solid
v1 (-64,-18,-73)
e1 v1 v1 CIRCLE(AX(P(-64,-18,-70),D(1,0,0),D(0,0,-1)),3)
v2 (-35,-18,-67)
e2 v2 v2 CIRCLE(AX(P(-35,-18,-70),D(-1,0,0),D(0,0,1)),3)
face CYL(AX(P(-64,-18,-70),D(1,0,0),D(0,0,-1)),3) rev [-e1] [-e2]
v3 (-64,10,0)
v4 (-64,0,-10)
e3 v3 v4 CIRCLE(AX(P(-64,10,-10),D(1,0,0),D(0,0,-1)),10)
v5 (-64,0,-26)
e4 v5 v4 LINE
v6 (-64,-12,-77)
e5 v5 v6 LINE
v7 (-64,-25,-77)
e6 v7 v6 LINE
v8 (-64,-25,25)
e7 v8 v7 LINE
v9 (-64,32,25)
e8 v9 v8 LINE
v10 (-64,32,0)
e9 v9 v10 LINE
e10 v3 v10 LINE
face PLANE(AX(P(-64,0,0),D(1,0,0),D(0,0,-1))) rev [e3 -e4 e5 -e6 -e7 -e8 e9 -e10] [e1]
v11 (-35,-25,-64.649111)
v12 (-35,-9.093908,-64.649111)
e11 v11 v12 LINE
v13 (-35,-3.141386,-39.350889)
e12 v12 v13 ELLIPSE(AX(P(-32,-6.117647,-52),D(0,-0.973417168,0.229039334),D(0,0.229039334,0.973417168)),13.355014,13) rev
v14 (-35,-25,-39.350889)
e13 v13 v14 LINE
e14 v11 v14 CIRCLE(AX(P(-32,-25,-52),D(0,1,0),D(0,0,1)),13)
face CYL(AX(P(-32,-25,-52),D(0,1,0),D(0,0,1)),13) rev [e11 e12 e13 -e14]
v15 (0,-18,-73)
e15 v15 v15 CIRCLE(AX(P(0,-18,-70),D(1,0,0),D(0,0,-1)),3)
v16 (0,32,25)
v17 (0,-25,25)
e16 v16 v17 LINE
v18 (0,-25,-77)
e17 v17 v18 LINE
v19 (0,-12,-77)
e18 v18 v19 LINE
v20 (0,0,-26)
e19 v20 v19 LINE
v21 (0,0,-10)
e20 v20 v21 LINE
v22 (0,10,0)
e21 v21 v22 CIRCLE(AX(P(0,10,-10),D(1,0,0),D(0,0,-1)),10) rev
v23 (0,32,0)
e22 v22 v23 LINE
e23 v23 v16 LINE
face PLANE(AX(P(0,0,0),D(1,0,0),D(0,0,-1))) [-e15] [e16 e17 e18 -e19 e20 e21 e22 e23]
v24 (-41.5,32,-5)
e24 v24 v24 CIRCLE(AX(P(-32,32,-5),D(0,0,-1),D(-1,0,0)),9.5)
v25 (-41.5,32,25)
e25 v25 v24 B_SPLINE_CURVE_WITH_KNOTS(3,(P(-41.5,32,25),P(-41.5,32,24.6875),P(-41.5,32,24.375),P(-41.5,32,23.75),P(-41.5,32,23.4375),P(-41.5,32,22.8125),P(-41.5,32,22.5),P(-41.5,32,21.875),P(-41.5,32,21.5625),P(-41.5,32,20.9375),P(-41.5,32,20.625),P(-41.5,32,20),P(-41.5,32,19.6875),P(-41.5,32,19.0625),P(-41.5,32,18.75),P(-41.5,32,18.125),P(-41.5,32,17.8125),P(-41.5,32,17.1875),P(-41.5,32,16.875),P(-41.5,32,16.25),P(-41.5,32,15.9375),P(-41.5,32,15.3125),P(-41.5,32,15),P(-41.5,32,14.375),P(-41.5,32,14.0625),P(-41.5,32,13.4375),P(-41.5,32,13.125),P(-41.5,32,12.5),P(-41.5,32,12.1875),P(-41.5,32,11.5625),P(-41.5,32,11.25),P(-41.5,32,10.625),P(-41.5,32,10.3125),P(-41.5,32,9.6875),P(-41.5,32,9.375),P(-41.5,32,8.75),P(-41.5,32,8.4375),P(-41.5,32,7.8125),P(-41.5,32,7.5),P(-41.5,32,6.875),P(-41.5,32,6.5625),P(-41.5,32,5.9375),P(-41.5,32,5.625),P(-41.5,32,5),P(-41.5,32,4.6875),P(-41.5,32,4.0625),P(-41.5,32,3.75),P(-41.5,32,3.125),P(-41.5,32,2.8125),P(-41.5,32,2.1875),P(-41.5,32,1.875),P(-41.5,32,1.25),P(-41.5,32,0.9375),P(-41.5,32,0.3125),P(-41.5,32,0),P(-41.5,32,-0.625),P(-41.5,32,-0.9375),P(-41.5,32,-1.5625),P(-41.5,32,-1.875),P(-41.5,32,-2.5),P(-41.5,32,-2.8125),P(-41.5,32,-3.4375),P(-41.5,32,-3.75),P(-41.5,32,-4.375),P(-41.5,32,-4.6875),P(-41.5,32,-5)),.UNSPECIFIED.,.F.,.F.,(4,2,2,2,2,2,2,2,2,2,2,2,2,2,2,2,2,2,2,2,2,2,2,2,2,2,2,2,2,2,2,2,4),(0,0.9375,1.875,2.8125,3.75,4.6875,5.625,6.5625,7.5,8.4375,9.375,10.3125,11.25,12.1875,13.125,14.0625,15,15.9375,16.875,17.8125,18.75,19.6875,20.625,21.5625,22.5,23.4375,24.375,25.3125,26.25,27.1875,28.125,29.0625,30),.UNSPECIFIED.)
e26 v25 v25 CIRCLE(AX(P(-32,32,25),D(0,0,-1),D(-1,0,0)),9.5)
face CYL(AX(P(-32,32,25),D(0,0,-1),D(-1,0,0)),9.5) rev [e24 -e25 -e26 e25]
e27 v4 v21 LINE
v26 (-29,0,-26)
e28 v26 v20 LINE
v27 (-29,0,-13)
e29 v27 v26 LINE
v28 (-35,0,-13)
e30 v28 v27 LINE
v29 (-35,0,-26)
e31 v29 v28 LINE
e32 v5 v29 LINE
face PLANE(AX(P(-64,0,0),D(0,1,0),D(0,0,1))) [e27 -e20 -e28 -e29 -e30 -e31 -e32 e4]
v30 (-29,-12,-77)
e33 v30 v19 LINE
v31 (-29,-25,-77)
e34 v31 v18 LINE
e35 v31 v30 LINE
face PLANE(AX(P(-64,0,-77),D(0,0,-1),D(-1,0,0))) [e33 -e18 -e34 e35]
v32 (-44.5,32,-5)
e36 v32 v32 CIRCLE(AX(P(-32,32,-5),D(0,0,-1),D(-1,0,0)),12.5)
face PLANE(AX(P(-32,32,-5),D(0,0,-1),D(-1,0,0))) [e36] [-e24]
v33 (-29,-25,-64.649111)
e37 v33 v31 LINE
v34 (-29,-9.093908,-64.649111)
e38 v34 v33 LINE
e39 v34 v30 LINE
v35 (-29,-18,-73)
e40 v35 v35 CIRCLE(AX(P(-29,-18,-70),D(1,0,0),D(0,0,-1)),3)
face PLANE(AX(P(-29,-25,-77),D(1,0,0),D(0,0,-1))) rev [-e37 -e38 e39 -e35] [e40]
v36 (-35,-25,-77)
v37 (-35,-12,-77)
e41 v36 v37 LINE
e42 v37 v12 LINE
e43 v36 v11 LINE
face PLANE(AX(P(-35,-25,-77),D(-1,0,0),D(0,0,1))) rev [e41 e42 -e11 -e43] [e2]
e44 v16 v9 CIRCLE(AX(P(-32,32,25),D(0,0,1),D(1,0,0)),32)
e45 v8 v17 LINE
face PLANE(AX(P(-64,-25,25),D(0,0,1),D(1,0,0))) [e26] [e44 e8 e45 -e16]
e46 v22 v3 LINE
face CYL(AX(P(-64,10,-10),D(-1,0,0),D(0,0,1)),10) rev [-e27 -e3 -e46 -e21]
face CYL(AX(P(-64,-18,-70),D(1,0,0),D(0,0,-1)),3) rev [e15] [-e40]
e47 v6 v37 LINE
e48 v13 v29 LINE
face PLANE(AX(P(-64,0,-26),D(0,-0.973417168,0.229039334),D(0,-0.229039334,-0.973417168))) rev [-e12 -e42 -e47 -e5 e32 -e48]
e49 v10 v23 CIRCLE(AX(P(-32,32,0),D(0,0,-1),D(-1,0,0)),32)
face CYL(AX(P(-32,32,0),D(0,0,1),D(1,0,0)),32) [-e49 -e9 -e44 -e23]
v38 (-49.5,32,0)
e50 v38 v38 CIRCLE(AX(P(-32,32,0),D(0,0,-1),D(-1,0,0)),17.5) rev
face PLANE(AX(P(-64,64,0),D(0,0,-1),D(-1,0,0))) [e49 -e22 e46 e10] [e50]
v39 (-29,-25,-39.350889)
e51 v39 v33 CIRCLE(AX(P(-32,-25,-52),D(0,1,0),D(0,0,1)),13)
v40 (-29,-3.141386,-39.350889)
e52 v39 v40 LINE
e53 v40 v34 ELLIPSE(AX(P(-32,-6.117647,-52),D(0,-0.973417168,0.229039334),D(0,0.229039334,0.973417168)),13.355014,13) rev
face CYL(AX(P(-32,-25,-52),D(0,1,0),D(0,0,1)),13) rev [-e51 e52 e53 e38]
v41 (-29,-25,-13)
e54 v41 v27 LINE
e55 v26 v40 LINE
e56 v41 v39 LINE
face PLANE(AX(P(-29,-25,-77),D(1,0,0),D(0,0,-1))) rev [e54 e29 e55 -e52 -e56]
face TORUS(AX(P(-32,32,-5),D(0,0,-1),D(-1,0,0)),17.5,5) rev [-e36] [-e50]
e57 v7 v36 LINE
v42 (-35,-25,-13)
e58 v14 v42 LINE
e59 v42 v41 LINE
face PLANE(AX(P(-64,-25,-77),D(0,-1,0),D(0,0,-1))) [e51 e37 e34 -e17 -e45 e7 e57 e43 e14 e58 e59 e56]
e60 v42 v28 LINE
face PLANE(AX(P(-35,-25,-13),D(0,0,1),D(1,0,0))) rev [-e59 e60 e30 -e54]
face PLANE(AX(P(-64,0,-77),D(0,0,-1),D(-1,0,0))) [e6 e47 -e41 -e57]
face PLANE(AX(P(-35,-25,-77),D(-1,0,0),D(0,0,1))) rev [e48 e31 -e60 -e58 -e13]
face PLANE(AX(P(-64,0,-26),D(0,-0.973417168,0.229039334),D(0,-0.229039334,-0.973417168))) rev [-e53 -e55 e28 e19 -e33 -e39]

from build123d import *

# Parameters (mm, degrees)
ESTRUSIONE_ESTRUSIONE1_DEPTH = 64
RACCORDO1_RADIUS             = 32
RACCORDO1_LENGTH             = 25
SCHIZZO2_R                   = 13
TAGLIO_ESTRUSIONE1_DEPTH     = 119.831813922
SCHIZZO5_W                   = 6
SCHIZZO5_H                   = 64
TAGLIO_ESTRUSIONE2_DEPTH     = 119.831813922
TAGLIO_ESTRUSIONE3_DEPTH     = 119.831813922
SCHIZZO7_R                   = 3
TAGLIO_ESTRUSIONE4_DEPTH     = 119.831813922
SCHIZZO8_R                   = 12.5
ESTRUSIONE_ESTRUSIONE2_DEPTH = 5
SCHIZZO9_R                   = 9.5
TAGLIO_ESTRUSIONE5_DEPTH     = 116.654658358
RACCORDO2_R                  = 10
RACCORDO3_R                  = 5


with BuildPart() as part:
    # Schizzo1 → Estrusione-Estrusione1 (new body)
    with BuildSketch(Plane(origin=(0, 0, 0), x_dir=(0, 0, -1), z_dir=(1, 0, 0))):
        Polygon((0, 0), (77, 0), (77, -25), (-25, -25), (-25, 64), (0, 64), align=None)
    extrude(amount=-ESTRUSIONE_ESTRUSIONE1_DEPTH)

    # Raccordo1: full round fillet: the end face becomes a half cylinder, R = half its width
    raccordo1_face = Plane((-32, 64, 12.5), x_dir=(0, 0, -1), z_dir=(0, 1, 0))  # on the end face: x along it, z out of the body
    raccordo1_slab = raccordo1_face.offset(-RACCORDO1_RADIUS / 2) * Box(RACCORDO1_LENGTH, 2 * RACCORDO1_RADIUS, RACCORDO1_RADIUS, mode=Mode.PRIVATE)  # the body's end, R deep
    raccordo1_round = Plane((-32, 32, 12.5), x_dir=(0, 1, 0), z_dir=(0, 0, -1)) * Cylinder(RACCORDO1_RADIUS, RACCORDO1_LENGTH, mode=Mode.PRIVATE)  # its axis R under the face
    add(raccordo1_slab - raccordo1_round, mode=Mode.SUBTRACT)

    # Schizzo2 → Taglio-Estrusione1 (cut, through all)
    with BuildSketch(Plane(origin=(0, 0, 0), x_dir=(1, 0, 0), z_dir=(0, 1, 0))):
        with Locations(Location((-32, 52, 0), (0, 0, 270))):
            Circle(SCHIZZO2_R)
    extrude(amount=-TAGLIO_ESTRUSIONE1_DEPTH, mode=Mode.SUBTRACT)

    # Schizzo5 → Taglio-Estrusione2 (cut, through all)
    with BuildSketch(Plane(origin=(0, 0, 0), x_dir=(1, 0, 0), z_dir=(0, 1, 0))):
        with Locations((-32, 45)):
            Rectangle(SCHIZZO5_W, SCHIZZO5_H)
    extrude(amount=-TAGLIO_ESTRUSIONE2_DEPTH, mode=Mode.SUBTRACT)

    # Schizzo6 → Taglio-Estrusione3 (cut, through all)
    with BuildSketch(Plane(origin=(0, 0, 0), x_dir=(0, 0, -1), z_dir=(1, 0, 0))):
        Polygon((26, 0), (77, -12), (77, 0), align=None)
    extrude(amount=-TAGLIO_ESTRUSIONE3_DEPTH, mode=Mode.SUBTRACT)

    # Schizzo7 → Taglio-Estrusione4 (cut, through all)
    with BuildSketch(Plane(origin=(0, 0, 0), x_dir=(0, 0, -1), z_dir=(1, 0, 0))):
        with Locations((70, -18)):
            Circle(SCHIZZO7_R)
    extrude(amount=-TAGLIO_ESTRUSIONE4_DEPTH, mode=Mode.SUBTRACT)

    # Schizzo8 → Estrusione-Estrusione2 (add)
    with BuildSketch(Plane(origin=(0, 0, 0), x_dir=(-1, 0, 0), z_dir=(0, 0, -1))):
        with Locations((32, 32)):
            Circle(SCHIZZO8_R)
    extrude(amount=ESTRUSIONE_ESTRUSIONE2_DEPTH)

    # Schizzo9 → Taglio-Estrusione5 (cut, through all)
    with BuildSketch(Plane(origin=(0, 0, -5), x_dir=(-1, 0, 0), z_dir=(0, 0, -1))):
        with Locations((32, 32)):
            Circle(SCHIZZO9_R)
    extrude(amount=-TAGLIO_ESTRUSIONE5_DEPTH, mode=Mode.SUBTRACT)

    # Raccordo2
    raccordo2_edges = [part.edges().sort_by_distance(p)[0] for p in [
        (-32, 0, 0),
    ]]
    fillet(raccordo2_edges, radius=RACCORDO2_R)

    # Raccordo3
    raccordo3_edges = [part.edges().sort_by_distance(p)[0] for p in [
        (-19.5, 32, 0),
    ]]
    fillet(raccordo3_edges, radius=RACCORDO3_R - 0.0001)  # a hair under: the kernel refuses the full size


solid = part.part
